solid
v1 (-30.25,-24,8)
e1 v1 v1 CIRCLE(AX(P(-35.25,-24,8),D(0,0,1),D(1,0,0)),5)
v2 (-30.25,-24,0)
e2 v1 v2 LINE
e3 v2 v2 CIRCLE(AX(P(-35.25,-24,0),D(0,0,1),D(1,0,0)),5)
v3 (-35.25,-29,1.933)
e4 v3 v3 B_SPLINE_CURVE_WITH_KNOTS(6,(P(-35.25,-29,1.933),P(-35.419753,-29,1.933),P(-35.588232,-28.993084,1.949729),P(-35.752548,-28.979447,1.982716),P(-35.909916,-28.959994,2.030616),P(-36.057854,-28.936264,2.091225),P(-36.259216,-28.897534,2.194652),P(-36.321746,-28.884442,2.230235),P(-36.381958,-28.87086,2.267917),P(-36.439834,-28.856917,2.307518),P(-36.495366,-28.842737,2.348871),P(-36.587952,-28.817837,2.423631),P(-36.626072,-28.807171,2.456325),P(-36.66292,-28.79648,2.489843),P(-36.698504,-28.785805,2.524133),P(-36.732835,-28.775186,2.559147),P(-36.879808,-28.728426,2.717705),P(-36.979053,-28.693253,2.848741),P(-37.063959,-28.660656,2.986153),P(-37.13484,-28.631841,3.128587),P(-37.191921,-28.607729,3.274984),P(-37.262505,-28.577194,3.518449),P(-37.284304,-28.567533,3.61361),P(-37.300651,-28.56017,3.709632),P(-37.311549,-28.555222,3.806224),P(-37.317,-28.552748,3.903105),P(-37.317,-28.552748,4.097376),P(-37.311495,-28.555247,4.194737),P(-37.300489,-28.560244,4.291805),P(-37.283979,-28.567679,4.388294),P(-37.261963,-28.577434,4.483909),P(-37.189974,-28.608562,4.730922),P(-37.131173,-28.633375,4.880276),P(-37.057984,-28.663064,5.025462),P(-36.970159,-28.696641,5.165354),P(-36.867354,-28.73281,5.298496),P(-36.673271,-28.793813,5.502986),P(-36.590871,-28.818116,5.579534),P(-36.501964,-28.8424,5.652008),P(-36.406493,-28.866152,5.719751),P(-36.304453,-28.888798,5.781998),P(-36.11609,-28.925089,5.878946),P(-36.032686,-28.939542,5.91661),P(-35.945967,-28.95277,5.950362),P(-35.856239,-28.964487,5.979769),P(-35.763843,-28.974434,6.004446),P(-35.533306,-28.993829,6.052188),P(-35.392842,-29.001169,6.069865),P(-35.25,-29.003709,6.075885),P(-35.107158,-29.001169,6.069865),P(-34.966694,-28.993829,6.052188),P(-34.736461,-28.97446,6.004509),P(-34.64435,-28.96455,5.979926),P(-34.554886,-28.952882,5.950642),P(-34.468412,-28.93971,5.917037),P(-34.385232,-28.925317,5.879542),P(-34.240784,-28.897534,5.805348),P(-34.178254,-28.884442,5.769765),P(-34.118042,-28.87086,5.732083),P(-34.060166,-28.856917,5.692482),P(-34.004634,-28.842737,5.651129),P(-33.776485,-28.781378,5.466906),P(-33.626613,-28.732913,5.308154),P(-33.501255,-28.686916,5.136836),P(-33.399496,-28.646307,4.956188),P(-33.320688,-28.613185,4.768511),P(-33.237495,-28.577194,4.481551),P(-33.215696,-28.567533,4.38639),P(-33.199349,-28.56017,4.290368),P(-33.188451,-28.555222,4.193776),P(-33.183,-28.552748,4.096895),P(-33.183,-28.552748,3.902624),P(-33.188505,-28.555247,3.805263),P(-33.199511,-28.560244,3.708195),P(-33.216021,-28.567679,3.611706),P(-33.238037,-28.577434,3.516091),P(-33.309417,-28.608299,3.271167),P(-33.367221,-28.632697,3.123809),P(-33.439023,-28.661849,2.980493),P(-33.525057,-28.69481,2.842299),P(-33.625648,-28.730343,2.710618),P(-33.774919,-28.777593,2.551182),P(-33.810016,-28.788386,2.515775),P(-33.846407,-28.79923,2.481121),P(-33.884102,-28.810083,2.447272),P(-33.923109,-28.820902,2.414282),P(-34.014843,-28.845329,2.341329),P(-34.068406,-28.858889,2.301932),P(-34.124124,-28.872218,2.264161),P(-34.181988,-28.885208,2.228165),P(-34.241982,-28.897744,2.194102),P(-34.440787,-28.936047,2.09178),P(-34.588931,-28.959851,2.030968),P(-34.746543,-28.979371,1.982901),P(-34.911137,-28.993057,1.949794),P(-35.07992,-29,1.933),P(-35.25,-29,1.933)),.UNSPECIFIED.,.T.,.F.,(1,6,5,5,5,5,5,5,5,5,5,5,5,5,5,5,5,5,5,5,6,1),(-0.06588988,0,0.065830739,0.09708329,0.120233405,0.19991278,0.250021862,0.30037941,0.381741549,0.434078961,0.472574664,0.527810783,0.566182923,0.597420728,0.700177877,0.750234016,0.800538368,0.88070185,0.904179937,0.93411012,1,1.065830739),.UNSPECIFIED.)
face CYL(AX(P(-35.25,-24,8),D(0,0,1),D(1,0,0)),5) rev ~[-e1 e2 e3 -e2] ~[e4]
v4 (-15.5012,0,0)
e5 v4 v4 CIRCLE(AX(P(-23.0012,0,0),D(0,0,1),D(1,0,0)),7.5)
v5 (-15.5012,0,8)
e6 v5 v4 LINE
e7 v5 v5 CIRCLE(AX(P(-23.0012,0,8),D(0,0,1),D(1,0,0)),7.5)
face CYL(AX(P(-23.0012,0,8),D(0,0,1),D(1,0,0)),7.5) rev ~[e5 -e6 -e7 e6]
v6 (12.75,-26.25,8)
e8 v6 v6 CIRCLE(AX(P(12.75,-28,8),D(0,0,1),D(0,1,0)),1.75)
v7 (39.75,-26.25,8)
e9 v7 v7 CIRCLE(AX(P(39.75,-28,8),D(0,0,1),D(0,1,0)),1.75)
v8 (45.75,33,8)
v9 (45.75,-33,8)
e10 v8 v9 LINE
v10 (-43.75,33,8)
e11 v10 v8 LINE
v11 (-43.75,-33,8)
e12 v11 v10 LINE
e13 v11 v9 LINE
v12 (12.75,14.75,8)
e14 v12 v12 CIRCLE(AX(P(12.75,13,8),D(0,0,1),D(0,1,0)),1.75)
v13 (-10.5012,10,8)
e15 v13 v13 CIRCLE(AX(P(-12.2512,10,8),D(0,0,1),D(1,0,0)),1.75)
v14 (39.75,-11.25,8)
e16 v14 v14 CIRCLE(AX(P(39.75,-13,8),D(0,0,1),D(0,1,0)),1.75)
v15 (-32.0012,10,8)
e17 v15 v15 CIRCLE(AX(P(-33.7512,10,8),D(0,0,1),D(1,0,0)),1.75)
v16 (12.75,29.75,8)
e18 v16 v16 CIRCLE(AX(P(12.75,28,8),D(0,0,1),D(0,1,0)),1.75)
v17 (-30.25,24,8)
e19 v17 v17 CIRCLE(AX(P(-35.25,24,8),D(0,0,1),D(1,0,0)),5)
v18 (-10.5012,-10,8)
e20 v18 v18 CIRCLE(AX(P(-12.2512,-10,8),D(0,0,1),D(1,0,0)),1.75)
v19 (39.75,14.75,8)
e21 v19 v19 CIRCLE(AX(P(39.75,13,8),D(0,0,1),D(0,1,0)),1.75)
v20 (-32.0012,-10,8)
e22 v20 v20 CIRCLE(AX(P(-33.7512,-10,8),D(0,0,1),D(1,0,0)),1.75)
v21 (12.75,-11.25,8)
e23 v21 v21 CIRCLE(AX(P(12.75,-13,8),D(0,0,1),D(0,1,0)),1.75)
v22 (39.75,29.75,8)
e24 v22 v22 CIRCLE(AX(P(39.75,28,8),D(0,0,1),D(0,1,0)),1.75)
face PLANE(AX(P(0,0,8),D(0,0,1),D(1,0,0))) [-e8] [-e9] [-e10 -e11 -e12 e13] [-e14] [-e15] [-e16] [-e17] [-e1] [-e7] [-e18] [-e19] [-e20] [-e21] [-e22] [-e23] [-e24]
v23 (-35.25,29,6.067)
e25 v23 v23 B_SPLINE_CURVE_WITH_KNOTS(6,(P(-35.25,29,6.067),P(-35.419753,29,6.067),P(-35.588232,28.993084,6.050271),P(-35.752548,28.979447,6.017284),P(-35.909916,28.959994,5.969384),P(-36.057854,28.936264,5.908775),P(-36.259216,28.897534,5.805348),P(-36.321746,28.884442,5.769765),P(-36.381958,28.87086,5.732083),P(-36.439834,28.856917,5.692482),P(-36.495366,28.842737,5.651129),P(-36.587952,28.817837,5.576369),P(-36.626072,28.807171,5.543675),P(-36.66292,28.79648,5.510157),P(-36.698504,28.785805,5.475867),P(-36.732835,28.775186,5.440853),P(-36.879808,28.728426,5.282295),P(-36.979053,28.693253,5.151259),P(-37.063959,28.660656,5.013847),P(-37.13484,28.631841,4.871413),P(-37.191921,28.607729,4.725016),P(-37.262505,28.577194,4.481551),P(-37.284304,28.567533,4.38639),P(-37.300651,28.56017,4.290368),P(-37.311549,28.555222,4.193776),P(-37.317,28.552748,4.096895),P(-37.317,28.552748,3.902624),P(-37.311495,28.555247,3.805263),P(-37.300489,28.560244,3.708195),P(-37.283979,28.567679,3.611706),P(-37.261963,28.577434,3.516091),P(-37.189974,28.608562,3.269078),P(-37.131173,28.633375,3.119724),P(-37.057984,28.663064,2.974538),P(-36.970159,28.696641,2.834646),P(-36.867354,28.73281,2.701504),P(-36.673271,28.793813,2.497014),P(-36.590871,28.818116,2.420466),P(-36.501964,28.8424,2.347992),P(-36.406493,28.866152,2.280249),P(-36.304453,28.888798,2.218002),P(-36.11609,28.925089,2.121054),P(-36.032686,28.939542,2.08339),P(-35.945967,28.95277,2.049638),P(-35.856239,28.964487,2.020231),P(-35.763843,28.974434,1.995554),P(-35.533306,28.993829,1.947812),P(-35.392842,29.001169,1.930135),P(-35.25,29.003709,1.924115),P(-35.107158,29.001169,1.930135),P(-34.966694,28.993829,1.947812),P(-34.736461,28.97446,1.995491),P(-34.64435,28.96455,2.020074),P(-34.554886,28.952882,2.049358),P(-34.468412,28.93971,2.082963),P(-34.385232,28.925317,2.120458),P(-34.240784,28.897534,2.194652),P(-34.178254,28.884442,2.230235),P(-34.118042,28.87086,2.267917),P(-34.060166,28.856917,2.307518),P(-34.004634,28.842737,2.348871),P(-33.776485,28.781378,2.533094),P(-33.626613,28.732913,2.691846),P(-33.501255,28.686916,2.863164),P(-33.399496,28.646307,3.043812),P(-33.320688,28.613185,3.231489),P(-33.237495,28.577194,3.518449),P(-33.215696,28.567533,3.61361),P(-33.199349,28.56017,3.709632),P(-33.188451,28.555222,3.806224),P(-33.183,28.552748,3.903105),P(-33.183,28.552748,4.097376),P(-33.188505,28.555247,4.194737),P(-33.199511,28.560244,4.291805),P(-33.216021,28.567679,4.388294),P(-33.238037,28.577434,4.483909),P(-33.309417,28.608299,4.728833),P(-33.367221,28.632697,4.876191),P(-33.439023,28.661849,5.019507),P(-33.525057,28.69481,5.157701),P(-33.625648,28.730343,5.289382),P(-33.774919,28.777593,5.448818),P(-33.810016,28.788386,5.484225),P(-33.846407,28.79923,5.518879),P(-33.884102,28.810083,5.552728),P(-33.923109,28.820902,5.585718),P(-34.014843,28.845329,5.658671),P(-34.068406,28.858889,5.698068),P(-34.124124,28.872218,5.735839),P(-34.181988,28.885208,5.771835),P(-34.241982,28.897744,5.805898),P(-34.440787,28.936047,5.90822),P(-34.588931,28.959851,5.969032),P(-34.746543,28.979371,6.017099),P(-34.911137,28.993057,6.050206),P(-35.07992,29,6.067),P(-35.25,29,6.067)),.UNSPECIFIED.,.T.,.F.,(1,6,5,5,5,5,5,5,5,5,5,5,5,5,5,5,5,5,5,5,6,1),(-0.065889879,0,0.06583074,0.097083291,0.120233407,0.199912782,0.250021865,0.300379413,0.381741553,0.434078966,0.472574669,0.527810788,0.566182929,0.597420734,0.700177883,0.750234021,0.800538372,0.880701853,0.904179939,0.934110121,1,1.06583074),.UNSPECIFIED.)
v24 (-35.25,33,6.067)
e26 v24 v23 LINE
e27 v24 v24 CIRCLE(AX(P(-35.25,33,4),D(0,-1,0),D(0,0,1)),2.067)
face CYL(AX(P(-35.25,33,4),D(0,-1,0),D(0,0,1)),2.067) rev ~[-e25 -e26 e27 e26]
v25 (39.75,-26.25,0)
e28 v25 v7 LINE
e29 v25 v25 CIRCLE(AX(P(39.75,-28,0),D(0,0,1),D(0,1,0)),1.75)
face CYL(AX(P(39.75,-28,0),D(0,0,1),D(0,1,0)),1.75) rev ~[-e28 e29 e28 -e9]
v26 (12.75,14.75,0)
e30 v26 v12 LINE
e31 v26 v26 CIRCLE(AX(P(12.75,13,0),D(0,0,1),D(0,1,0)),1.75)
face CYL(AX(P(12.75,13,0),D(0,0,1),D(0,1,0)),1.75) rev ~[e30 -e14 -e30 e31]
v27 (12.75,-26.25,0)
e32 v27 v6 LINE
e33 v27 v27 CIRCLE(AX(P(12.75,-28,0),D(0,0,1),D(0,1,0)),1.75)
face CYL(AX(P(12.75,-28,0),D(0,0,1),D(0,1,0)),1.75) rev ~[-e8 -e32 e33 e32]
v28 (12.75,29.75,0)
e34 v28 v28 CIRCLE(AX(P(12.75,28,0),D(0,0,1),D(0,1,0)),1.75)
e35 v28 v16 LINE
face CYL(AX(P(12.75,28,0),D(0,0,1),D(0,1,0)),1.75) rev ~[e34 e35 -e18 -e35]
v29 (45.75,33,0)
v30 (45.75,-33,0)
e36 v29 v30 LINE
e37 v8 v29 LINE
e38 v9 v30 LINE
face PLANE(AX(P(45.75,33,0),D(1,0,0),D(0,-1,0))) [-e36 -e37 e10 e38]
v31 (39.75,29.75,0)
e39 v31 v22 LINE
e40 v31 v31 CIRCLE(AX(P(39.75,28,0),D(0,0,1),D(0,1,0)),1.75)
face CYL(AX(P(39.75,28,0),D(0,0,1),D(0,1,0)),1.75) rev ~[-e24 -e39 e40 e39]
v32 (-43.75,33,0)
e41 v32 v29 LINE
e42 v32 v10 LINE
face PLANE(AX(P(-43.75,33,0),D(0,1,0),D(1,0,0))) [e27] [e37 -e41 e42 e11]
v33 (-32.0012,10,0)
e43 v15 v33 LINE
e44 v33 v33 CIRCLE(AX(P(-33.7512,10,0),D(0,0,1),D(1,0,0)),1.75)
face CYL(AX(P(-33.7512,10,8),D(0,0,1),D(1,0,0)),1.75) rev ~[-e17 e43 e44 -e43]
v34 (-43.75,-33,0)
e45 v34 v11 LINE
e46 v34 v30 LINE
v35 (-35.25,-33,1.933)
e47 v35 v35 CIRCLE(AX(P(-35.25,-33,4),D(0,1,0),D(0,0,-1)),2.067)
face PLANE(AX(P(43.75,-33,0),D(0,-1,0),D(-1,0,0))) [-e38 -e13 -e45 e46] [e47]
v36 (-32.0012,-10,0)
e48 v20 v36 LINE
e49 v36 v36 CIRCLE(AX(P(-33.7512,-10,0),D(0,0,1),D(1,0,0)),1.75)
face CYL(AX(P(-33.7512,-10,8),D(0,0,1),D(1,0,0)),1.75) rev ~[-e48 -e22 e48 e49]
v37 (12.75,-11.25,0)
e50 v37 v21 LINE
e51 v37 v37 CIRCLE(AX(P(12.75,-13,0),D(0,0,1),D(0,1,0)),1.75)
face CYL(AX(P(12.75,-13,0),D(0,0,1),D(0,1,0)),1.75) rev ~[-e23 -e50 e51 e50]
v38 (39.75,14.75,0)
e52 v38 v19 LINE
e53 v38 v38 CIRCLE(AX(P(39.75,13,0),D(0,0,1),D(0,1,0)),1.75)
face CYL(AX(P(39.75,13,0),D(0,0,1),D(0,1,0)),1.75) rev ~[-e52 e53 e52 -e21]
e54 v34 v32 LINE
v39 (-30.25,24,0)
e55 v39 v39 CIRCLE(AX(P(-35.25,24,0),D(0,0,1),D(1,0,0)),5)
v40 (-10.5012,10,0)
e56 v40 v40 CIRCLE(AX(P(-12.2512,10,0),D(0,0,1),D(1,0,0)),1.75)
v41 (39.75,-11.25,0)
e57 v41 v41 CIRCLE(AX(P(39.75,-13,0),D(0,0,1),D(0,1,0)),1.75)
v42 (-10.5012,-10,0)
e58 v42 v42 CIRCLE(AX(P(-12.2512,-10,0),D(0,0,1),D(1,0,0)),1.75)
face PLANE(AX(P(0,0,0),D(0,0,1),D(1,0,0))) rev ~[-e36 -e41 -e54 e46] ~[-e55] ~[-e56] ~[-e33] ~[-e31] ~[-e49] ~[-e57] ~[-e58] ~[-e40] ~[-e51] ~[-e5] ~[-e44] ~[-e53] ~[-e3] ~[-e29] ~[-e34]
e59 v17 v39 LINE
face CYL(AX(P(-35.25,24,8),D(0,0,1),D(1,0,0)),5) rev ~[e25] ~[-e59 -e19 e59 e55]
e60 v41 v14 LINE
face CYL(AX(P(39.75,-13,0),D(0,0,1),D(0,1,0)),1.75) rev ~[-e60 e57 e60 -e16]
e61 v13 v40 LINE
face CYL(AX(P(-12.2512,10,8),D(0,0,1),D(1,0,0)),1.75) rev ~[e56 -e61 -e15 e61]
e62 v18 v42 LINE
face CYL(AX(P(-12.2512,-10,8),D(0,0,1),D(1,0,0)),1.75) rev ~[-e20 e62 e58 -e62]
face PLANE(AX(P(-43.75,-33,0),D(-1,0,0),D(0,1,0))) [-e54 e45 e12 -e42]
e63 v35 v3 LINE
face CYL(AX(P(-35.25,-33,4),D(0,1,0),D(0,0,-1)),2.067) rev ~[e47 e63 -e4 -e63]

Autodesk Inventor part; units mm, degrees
ref_plane "YZ Plane" through (0, 0, 0) normal (1, 0, 0) x (0, 1, 0)
ref_plane "XZ Plane" through (0, 0, 0) normal (0, 1, 0) x (-1, 0, 0)
ref_plane "XY Plane" through (0, 0, 0) normal (0, 0, 1) x (1, 0, 0)
sketch "Sketch1" plane through (0, 0, 0) normal (0, 0, 1) x (1, 0, 0)
  line L0 (-43.75, 33) -> (43.75, 33)
  line L1 (43.75, 33) -> (43.75, -33)
  line L2 (43.75, -33) -> (-43.75, -33)
  line L3 (-43.75, -33) -> (-43.75, 33)
  point P0 (0, 0)
  point P1 (0, 33)
  point P2 (-43.75, 0)
  dimension "d0" = 87.5
  dimension "d1" = 66
extrude "Extrusion1" add sketch "Sketch1" along normal blind 8
sketch "Sketch4" plane through (0, 0, 8) normal (0, 0, 1) x (1, 0, 0)
  line L0 (43.75, 33) -> (-43.75, 33) projected
  line L1 (-43.75, 33) -> (-43.75, -33) projected
  circle A0 centre (-35.25, 24) radius 5
  circle A1 centre (-35.25, -24) radius 5
  line L2 (-43.75, -33) -> (43.75, -33) projected
  point P0 (0, 0)
  dimension "d27" = 8.5
  dimension "d28" = 9
  dimension "d29" = 10
  dimension "d30" = 9
extrude "Extrusion4" cut sketch "Sketch4" against normal through all
sketch "Sketch5" plane through (0, 0, 8) normal (0, 0, 1) x (1, 0, 0)
  circle A0 centre (-23.0012, 0) radius 4
  circle A1 centre (-23.0012, 0) radius 7.5
  line L0 (-43.75, 33) -> (-43.75, -33) projected
  line L1 (43.75, 33) -> (-43.75, 33) projected
  circle A2 centre (-23.0012, 0) radius 7 projected
  point P0 (0, 0)
  point P1 (-43.75, 0)
  dimension "d24" = 15
  dimension "d33" = 20.7488
extrude "Extrusion5" cut sketch "Sketch5" against normal through all contours A0 | A1 | A2
sketch "Sketch6" plane through (0, 0, 8) normal (0, 0, 1) x (1, 0, 0)
  circle A0 centre (-33.7512, 10) radius 1.75
  circle A1 centre (-12.2512, 10) radius 1.75
  circle A2 centre (-12.2512, -10) radius 1.75
  circle A3 centre (-33.7512, -10) radius 1.75
  line L0 (-33.7512, 10) -> (-12.2512, 10)
  line L1 (-12.2512, 10) -> (-12.2512, -10)
  line L2 (-12.2512, -10) -> (-33.7512, -10)
  line L3 (-33.7512, -10) -> (-33.7512, 10)
  line L4 (-33.7512, 10) -> (-12.2512, -10) construction
  line L5 (-12.2512, 10) -> (-33.7512, -10) construction
  circle A4 centre (-23.0012, 0) radius 7.5 projected
  line L6 (-43.75, 33) -> (-43.75, -33) projected
  point P0 (0, 0)
  point P1 (-23.0012, 0)
  dimension "d35" = 3.5
  dimension "d36" = 21.5
  dimension "d37" = 20
extrude "Extrusion6" cut sketch "Sketch6" against normal through all contours L0 L3 A0 | A0 L3 L0 | L0 L1 A1 | A1 L1 L0 | L3 L2 A3 | A3 L2 L3 | L1 L2 A2 | A2 L2 L1
sketch "Sketch7" plane through (0, 0, 8) normal (0, 0, 1) x (1, 0, 0)
  point P0 (0, 0)
sketch "Sketch8" plane through (0, 0, 0) normal (0, 0, -1) x (-1, 0, 0)
  line L0 (-35.75, -33) -> (-43.75, -33)
  line L1 (-43.75, -33) -> (-43.75, 33)
  line L2 (-43.75, 33) -> (-35.75, 33)
  line L3 (-35.75, 33) -> (-35.75, -33)
  line L4 (-8.75, -33) -> (-16.75, -33)
  line L5 (-16.75, -33) -> (-16.75, 33)
  line L6 (-16.75, 33) -> (-8.75, 33)
  line L7 (-8.75, 33) -> (-8.75, -33)
  line L8 (-44.55, -20.5) -> (-44.55, -29.5) projected
  point P0 (0, 0)
  point P1 (-39.75, -28)
  point P2 (-39.75, -13)
  point P3 (-39.75, 13)
  point P4 (-39.75, 28)
  dimension "d38" = 4
  dimension "d39" = 5
  dimension "d40" = 15
  dimension "d41" = 5
  dimension "d42" = 15
  dimension "d56" = 26
hole "Hole1" at (39.75, 28, 0) direction (0, 0, 1) diameter 3.5 end through all
move faces "Move1" translate (2, 0, 0) faces at (43.75, -11, 2.6667)
pattern_linear "Rectangular Pattern2" count 2 spacing 15 along (0, -1, 0) count 2 spacing 41 along (0, -1, 0) of "Hole1"
pattern_linear "Rectangular Pattern3" count 2 spacing 27 along (-1, 0, 0) of "Hole1", "Rectangular Pattern2"
sketch "Sketch10" plane through (-43.75, 33, 8) normal (0, 1, 0) x (1, 0, 0)
  line L0 (0, 8) -> (0, 0) projected
  point P0 (43.75, 8)
  point P1 (8.5, 4)
  point P2 (0, 4)
  dimension "d66" = 8.5
hole "Hole2" at (-35.25, 33, 4) direction (0, -1, 0) diameter 4.134 depth 7.45 tip angle 118 thread size "M5x0.8" class "6H" standard "ISO Metric profile"
sketch "Sketch11" plane through (-43.75, -33, 0) normal (0, -1, 0) x (1, 0, 0)
  line L0 (0, 0) -> (0, 8) projected
  point P0 (43.75, 0)
  point P1 (8.5, 4)
  point P2 (0, 4)
  dimension "d74" = 8.5
hole "Hole3" at (-35.25, -33, 4) direction (0, 1, 0) diameter 4.134 depth 7.45 tip angle 118 thread size "M5x0.8" class "6H" standard "ISO Metric profile"
equation "\"d30\" = d28"
equation "\"d41\" = d39"
equation "\"d42\" = d40"
properties part number "0005-10-011" material "Wood (Maple)"
